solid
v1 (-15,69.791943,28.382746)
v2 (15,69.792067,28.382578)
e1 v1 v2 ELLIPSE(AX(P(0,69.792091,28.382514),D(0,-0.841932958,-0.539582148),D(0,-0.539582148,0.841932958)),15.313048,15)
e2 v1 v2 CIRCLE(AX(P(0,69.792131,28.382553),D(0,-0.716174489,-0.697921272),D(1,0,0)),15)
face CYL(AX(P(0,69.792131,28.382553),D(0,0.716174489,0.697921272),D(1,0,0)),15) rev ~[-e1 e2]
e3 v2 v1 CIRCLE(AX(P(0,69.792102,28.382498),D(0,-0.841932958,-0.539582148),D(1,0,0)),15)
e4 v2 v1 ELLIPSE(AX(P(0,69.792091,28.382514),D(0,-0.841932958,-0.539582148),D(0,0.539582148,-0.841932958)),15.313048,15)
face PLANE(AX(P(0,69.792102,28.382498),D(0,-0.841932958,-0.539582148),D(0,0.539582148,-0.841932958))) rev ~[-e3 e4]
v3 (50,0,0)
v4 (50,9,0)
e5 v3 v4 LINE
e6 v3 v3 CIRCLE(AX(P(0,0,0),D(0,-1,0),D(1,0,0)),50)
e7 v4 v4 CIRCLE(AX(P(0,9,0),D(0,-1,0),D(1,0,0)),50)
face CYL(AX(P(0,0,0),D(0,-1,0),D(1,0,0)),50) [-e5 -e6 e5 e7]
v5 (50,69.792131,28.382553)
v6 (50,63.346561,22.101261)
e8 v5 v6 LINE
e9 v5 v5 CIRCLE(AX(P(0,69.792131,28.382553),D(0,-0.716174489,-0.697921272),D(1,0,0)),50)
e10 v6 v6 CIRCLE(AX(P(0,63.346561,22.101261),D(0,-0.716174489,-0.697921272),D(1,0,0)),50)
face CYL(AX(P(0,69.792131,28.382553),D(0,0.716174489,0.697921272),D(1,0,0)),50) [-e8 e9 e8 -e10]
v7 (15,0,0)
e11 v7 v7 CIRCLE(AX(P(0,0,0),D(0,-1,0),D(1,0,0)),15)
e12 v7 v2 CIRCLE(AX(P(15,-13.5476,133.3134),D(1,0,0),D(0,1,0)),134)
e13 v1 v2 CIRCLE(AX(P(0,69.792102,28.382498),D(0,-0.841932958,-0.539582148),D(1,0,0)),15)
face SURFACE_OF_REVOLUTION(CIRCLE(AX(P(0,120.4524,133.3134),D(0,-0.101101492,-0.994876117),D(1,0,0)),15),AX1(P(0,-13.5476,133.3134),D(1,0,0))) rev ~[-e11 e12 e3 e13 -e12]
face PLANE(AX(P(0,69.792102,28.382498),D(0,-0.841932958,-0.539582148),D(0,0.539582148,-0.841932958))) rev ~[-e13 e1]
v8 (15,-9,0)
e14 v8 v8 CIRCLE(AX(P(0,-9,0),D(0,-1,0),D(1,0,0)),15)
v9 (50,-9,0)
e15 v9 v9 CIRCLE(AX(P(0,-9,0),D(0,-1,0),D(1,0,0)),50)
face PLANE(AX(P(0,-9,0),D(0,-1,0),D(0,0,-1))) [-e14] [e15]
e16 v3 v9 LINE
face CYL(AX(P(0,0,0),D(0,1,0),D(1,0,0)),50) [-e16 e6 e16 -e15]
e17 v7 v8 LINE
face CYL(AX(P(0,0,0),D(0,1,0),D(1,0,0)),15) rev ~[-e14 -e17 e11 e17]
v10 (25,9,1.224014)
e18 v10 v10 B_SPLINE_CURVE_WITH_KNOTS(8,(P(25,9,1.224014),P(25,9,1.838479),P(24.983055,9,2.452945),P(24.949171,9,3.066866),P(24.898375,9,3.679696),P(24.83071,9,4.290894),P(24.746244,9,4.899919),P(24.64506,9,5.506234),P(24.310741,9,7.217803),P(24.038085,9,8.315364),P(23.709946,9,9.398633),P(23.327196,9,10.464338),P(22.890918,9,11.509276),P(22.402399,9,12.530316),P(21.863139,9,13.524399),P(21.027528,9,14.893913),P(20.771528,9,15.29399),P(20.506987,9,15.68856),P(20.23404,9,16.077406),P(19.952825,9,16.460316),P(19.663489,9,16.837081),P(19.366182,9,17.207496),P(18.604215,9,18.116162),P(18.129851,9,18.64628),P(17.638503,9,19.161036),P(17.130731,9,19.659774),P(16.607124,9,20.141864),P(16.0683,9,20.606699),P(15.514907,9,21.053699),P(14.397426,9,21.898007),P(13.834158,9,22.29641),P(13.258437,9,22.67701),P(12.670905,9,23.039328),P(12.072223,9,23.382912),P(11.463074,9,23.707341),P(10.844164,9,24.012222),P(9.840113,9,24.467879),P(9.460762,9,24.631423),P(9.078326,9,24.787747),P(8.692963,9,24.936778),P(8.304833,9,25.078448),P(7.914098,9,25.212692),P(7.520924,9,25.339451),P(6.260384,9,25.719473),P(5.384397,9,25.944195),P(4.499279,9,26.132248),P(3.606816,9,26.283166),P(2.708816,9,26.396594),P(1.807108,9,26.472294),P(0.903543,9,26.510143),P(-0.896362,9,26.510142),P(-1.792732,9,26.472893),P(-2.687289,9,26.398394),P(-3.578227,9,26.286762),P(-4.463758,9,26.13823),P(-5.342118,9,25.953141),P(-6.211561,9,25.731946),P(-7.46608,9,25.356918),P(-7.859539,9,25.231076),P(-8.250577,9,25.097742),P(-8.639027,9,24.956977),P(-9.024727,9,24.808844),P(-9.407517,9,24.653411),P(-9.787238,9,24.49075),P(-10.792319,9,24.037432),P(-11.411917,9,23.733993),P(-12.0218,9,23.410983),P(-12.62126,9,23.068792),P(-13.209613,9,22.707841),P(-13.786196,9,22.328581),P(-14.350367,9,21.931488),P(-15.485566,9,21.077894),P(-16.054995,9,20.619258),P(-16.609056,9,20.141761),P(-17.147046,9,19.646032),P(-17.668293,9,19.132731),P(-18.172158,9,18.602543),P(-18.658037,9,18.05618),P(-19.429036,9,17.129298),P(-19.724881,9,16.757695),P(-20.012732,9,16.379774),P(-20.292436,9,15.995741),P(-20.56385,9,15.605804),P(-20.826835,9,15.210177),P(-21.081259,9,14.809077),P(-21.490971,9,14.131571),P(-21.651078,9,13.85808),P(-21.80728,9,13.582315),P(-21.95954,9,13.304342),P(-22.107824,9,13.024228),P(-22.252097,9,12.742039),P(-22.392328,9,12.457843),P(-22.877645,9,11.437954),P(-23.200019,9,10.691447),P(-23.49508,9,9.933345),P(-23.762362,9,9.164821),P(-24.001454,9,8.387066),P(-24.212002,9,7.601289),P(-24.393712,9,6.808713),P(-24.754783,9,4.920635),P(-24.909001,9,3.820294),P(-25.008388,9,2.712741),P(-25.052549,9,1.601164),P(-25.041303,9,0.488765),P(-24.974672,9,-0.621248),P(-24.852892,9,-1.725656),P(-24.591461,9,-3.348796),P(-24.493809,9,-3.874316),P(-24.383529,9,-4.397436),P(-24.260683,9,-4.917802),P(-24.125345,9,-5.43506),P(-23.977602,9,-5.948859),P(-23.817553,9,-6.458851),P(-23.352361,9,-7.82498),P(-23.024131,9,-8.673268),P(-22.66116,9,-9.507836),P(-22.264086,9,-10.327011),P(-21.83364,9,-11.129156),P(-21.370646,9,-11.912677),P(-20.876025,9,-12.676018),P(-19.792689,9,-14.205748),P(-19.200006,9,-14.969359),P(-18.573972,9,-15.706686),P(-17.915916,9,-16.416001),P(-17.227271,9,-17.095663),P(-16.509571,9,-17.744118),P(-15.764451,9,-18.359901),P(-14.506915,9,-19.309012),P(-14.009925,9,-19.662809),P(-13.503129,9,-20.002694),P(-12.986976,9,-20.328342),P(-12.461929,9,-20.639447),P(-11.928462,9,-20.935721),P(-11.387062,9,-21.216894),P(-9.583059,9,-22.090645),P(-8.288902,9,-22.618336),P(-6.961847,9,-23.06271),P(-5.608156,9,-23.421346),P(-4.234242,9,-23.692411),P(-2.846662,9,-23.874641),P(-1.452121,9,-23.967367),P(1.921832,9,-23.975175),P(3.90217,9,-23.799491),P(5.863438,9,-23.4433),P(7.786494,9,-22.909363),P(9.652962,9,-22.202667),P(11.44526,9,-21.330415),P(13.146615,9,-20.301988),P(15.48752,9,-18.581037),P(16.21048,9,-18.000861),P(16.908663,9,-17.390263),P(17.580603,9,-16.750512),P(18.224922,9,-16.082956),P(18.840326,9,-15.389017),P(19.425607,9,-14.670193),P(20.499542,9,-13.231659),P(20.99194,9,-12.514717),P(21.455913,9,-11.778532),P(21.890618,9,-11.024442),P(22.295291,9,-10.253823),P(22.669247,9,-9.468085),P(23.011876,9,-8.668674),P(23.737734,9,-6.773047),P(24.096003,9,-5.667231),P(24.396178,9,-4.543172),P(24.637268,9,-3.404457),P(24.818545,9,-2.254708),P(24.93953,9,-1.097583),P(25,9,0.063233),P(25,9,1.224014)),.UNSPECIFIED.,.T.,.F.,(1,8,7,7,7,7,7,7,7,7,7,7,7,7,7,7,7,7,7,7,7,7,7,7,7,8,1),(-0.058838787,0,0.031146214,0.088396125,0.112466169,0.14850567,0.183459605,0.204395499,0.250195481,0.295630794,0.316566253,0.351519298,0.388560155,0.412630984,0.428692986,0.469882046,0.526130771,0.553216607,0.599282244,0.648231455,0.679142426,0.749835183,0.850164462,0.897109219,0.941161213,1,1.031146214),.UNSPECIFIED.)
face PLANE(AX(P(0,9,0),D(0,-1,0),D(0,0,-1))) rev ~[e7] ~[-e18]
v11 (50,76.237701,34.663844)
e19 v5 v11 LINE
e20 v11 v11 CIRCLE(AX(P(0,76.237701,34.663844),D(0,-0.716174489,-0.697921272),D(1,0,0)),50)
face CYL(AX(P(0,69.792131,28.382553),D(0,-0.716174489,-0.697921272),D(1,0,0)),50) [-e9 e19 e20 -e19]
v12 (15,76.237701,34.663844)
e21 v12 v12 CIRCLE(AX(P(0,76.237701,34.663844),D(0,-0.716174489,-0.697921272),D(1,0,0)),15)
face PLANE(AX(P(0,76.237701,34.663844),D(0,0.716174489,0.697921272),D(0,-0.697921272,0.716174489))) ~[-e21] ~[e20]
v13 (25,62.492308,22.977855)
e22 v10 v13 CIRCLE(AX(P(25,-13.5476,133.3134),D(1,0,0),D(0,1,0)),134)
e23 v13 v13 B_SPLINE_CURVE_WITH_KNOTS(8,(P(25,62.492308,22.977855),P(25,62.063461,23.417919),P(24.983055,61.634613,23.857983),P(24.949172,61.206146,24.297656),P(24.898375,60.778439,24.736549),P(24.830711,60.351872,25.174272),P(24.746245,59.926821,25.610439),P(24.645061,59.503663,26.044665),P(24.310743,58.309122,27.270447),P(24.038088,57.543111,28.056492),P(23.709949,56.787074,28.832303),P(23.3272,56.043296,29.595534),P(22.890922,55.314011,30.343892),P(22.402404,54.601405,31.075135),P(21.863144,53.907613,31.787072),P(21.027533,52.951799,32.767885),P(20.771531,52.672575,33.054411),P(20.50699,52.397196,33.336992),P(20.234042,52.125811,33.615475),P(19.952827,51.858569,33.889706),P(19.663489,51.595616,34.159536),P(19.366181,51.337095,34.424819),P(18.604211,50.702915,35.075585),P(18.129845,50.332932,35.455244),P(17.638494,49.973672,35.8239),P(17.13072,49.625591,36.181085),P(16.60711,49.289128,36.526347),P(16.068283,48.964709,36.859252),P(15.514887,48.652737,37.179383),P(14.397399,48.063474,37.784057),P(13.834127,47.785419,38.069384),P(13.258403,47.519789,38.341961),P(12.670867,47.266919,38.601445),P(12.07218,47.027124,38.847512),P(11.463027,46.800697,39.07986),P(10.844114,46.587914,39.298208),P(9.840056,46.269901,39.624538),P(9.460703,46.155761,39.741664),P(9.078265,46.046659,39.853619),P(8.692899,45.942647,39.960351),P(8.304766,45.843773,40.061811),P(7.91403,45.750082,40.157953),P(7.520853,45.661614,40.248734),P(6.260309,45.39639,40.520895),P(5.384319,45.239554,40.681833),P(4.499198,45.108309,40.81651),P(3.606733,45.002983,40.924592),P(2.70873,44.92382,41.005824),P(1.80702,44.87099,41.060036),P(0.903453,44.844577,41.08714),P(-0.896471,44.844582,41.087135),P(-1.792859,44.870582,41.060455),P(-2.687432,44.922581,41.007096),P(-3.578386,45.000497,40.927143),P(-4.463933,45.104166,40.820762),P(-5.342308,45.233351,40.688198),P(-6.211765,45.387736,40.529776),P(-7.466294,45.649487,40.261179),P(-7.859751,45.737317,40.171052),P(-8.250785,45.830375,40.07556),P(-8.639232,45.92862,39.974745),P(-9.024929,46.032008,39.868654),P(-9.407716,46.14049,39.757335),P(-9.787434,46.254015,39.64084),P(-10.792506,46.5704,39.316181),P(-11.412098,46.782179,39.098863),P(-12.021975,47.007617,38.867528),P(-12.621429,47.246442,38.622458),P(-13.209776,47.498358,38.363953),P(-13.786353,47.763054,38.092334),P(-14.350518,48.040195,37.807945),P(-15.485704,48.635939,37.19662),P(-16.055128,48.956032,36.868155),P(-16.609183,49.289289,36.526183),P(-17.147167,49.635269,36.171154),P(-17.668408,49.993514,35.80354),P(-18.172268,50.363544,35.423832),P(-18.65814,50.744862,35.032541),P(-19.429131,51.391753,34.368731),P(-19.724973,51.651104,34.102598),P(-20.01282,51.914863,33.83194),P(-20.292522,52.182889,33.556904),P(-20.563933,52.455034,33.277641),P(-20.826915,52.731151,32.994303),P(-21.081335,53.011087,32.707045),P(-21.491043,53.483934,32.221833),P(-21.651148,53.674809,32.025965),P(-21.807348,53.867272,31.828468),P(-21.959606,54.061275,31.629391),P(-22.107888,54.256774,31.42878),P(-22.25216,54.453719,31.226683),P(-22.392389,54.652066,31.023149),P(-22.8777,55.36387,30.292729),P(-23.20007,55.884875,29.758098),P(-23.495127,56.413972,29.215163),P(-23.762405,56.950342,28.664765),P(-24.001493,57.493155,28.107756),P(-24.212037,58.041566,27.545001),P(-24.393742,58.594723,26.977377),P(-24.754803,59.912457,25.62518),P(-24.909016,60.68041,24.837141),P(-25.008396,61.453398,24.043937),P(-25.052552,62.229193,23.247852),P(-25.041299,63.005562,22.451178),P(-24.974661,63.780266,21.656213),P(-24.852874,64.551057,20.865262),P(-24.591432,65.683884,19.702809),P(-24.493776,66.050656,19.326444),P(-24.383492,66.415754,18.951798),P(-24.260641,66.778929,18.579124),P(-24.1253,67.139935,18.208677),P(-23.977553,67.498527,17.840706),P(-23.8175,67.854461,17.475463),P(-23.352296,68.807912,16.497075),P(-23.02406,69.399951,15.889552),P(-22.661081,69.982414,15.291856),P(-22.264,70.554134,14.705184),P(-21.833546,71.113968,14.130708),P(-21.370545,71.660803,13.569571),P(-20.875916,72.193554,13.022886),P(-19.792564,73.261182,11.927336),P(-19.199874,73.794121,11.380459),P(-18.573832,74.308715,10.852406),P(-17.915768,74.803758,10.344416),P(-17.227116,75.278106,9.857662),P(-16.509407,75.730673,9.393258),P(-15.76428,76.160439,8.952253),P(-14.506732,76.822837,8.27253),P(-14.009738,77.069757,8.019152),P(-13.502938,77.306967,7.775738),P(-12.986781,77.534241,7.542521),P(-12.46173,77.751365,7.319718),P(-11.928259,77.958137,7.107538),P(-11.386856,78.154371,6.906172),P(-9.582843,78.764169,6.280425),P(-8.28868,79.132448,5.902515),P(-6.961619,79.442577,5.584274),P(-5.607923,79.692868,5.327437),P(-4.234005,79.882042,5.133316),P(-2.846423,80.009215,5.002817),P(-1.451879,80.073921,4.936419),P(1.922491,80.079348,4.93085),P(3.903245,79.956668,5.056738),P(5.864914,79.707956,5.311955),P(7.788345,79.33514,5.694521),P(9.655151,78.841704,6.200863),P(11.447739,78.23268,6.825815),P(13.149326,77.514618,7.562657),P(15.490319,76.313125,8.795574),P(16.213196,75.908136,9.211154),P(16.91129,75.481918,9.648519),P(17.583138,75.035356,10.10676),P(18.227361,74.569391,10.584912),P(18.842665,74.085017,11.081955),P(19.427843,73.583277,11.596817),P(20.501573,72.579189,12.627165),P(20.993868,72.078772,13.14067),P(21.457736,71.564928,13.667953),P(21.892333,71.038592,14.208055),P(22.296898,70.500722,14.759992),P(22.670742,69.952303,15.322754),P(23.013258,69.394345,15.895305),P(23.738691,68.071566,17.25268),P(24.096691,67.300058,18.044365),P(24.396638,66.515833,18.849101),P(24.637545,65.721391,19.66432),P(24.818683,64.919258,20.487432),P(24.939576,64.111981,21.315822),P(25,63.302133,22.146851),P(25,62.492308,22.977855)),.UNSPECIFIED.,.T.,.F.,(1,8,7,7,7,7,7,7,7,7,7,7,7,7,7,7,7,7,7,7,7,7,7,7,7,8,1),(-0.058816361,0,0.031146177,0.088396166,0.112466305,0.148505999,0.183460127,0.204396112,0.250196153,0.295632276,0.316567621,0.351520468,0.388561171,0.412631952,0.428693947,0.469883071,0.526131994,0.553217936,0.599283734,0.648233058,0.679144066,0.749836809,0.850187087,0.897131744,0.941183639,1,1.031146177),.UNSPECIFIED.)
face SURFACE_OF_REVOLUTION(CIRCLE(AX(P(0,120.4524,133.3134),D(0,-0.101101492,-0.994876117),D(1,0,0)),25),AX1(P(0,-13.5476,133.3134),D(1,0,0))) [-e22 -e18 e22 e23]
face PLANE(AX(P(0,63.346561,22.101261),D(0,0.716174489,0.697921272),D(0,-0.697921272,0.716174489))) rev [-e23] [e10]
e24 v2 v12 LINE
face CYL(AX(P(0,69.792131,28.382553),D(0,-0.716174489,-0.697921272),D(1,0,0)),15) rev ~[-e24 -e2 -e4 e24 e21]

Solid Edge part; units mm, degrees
sketch "Sketch1" plane through (0, 0, 0) normal (1, 0, 0) x (0, 1, 0)
  arc A0 (0, 0) -> (69.7921, 28.3825) centre (-13.5476, 133.3134) ccw
sketch "Sketch2" plane through (0, 0, 0) normal (0, -1, 0) x (1, 0, 0)
  circle A0 centre (0, 0) radius 25
sweep "SweptProtrusion_2" add profiles "Sketch2" path "Sketch1"
sketch "Sketch3" plane through (0, 0, 0) normal (0, -1, 0) x (1, 0, 0)
  circle A0 centre (0, 0) radius 50
  circle A1 centre (0, 0) radius 15
extrude "ExtrudedProtrusion_6" add sketch "Sketch3" along normal blind 9
sketch "Sketch4" plane through (0, 0, 0) normal (0, -1, 0) x (1, 0, 0)
  circle A0 centre (0, 0) radius 50
  circle A1 centre (0, 0) radius 15
extrude "ExtrudedProtrusion_7" add sketch "Sketch4" against normal blind 9
mirror "Mirror1" about plane through (0, 36.9319, 9.1852) normal (0, 0.92633, 0.3767131) of "ExtrudedProtrusion_7"
mirror "Mirror2" about plane through (0, 36.9319, 9.1852) normal (0, 0.92633, 0.3767131) of "ExtrudedProtrusion_6"
sketch "Sketch5" plane through (0, 0, 0) normal (1, 0, 0) x (0, 1, 0)
  arc A0 (0, 0) -> (69.7921, 28.3825) centre (-13.5476, 133.3134) ccw
sketch "Sketch6" plane through (0, 0, 0) normal (0, -1, 0) x (1, 0, 0)
  circle A0 centre (0, 0) radius 15
sweep "SweptCutout_4" cut profiles "Sketch6" path "Sketch5"
